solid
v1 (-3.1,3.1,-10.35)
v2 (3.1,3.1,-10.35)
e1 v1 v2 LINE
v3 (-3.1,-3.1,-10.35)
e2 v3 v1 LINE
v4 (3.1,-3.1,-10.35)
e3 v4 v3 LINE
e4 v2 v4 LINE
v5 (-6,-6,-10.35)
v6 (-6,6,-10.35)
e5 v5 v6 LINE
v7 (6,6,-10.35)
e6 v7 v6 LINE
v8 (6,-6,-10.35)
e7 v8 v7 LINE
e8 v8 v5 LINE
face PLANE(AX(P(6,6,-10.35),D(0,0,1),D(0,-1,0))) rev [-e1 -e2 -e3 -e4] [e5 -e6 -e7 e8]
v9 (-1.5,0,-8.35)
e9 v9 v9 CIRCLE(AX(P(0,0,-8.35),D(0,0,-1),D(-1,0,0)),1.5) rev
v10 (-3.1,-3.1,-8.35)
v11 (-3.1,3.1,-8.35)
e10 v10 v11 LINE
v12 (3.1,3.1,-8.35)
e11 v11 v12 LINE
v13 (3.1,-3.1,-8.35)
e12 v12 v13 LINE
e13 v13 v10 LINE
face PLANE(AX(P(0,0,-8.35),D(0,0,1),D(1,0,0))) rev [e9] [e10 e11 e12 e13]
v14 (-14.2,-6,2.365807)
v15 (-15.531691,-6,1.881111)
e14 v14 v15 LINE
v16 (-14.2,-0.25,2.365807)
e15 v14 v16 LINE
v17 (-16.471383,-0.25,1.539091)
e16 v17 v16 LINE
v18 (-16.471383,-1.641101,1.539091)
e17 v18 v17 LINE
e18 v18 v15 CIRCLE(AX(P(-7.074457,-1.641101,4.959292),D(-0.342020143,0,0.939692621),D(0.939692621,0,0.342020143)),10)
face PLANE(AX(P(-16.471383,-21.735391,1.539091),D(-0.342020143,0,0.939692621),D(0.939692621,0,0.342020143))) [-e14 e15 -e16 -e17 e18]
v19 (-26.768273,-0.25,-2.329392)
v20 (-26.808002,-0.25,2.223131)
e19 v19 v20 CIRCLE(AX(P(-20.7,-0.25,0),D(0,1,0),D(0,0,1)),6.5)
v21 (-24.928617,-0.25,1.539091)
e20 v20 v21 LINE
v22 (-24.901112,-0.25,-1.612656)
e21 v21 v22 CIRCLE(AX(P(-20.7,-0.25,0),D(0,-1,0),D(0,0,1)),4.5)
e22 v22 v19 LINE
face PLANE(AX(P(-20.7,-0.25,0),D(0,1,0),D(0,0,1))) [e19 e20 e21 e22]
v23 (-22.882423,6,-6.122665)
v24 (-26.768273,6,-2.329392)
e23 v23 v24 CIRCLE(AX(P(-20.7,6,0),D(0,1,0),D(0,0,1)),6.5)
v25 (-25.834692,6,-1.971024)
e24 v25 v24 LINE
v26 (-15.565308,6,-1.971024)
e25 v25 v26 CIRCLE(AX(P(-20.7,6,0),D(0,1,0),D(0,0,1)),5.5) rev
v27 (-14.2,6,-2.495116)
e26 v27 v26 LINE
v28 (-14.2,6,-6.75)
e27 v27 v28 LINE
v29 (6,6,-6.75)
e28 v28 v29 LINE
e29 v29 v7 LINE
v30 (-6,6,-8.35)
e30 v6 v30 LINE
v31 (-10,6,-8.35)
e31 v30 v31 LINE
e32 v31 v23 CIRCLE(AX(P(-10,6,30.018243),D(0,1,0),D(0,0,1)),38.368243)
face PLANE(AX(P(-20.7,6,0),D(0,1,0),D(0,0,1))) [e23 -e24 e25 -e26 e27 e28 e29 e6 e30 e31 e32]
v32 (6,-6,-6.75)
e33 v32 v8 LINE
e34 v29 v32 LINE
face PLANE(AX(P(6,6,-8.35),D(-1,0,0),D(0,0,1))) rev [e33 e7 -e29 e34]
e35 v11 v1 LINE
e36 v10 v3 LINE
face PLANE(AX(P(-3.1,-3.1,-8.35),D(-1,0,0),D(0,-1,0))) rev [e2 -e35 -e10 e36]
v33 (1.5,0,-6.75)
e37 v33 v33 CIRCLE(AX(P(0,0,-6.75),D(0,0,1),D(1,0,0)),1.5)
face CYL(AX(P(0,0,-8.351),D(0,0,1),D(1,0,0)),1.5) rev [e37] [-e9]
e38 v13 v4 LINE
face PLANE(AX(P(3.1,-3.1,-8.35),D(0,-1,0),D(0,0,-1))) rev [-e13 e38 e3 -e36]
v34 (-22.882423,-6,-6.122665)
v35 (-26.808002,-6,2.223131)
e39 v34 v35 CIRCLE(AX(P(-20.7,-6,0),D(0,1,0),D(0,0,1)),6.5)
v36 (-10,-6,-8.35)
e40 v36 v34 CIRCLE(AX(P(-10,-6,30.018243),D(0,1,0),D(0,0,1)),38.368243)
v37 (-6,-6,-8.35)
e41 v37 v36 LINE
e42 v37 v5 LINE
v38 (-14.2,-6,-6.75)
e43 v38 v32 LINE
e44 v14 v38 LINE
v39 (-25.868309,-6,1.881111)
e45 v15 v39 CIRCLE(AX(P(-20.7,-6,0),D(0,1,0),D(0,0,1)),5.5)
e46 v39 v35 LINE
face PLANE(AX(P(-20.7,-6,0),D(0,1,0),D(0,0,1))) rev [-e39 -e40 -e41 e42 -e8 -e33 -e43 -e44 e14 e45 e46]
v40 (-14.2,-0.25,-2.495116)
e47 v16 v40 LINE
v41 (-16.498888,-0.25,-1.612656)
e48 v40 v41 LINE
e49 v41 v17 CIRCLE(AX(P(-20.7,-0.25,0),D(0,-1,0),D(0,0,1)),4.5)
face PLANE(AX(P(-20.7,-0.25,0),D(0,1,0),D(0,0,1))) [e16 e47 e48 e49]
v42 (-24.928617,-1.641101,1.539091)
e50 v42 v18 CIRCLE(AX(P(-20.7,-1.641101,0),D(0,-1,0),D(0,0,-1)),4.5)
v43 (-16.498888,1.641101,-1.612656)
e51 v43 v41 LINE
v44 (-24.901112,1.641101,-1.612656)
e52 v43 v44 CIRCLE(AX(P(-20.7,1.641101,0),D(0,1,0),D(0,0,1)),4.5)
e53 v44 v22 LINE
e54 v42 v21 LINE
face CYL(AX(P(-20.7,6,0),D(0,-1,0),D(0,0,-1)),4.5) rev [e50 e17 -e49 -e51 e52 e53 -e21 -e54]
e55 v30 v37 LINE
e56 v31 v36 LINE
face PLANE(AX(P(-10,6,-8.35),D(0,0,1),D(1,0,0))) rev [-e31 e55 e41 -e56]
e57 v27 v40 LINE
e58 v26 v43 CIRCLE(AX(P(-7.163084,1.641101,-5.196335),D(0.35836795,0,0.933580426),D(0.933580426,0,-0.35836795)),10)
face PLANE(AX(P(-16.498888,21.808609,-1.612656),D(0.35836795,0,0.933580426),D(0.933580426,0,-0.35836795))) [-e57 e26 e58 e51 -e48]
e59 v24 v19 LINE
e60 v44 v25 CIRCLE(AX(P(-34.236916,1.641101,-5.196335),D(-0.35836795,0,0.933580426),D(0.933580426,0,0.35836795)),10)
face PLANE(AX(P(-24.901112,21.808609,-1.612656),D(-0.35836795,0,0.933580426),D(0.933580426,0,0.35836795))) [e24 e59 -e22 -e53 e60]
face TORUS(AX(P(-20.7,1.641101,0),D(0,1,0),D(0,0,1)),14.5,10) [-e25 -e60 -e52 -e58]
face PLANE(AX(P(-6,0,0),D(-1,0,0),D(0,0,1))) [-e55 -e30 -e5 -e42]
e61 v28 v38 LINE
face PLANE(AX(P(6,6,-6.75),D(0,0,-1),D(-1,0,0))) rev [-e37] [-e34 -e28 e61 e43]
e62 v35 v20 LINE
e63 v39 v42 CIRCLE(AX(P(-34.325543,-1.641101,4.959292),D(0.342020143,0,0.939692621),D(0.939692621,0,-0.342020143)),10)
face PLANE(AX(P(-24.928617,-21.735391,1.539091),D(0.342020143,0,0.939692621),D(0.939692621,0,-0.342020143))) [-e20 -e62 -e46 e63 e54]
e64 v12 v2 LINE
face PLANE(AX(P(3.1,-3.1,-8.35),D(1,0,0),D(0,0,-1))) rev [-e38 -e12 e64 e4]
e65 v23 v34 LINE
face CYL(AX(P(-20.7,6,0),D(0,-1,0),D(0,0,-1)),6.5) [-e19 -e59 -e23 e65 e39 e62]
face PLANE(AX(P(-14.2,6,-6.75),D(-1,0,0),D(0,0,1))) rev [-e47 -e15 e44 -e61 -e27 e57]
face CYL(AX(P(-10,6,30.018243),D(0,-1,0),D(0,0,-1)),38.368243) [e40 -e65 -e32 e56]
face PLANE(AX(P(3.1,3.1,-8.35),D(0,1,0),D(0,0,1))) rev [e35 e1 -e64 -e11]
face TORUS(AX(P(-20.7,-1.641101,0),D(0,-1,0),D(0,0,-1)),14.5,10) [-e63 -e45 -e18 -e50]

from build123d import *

# Parameters (mm, degrees)
BOSS_EXTRUDE1_DEPTH = 6
CUT_EXTRUDE1_REACH  = 30.66
SKETCH3_R           = 1.5
BOSS_EXTRUDE2_DEPTH = 5.75
CUT_EXTRUDE2_START  = 6.25
CUT_EXTRUDE2_DEPTH  = 6.25
CHAMFER1_SIZE       = 1
FILLET1_R           = 10
SKETCH7_W           = 2
SKETCH7_H           = 12
BOSS_EXTRUDE3_DEPTH = 6
SKETCH8_W           = 6.2
SKETCH8_H           = 6.2
CUT_EXTRUDE3_DEPTH  = 2


with BuildPart() as part:
    # Sketch2 → Boss-Extrude1 (new, symmetric)
    with BuildSketch(Plane(origin=(0, 0, 0), x_dir=(1, 0, 0), z_dir=(0, 1, 0))):
        with BuildLine():
            Line((6, 6.75), (-14.2, 6.75))
            Line((-14.2, 6.75), (-14.2, 0))
            Line((-14.2, 0), (-16.2, 0))
            ThreePointArc((-16.2, 0), (-20.7, 4.5), (-25.2, 0))
            Line((-25.2, 0), (-27.2, 0))
            ThreePointArc((-27.2, 0), (-26.012050082, 3.745947667), (-22.882423407, 6.122665112))
            ThreePointArc((-22.882423407, 6.122665112), (-16.536777753, 7.78906592), (-10, 8.35))
            Line((-10, 8.35), (6, 8.35))
            Line((6, 8.35), (6, 6.75))
        make_face()
    extrude(amount=BOSS_EXTRUDE1_DEPTH, both=True)

    # Sketch3 → Cut-Extrude1 (cut, up to next)
    with BuildSketch(Plane.XY.offset(-6.75), mode=Mode.PRIVATE) as cut_extrude1_sk1:
        Circle(SKETCH3_R)
    cut_extrude1_tool1 = extrude(cut_extrude1_sk1.sketch, amount=-CUT_EXTRUDE1_REACH, mode=Mode.PRIVATE) & part.part
    add(cut_extrude1_tool1.solids().sort_by_distance((0, 0, -6.75))[0], mode=Mode.SUBTRACT)

    # Sketch5 → Boss-Extrude2 (add)
    with BuildSketch(Plane(origin=(0, -0.25, 0), x_dir=(1, 0, 0), z_dir=(0, 1, 0))):
        with BuildLine():
            Line((-24.928616794, -1.539090645), (-26.808002035, -2.223130932))
            ThreePointArc((-26.808002035, -2.223130932), (-21.828713155, 6.401250395), (-14.2, 0))
            Line((-14.2, 0), (-14.2, -2.365806523))
            Line((-14.2, -2.365806523), (-16.471383206, -1.539090645))
            ThreePointArc((-16.471383206, -1.539090645), (-20.7, 4.5), (-24.928616794, -1.539090645))
        make_face()
    extrude(amount=-BOSS_EXTRUDE2_DEPTH)

    # Sketch6 → Cut-Extrude2 (cut)
    with BuildSketch(Plane(origin=(0, -0.25, 0), x_dir=(1, 0, 0), z_dir=(0, 1, 0)).offset(CUT_EXTRUDE2_START)):
        with BuildLine():
            Line((-24.901111919, 1.612655773), (-26.768272772, 2.329391672))
            ThreePointArc((-26.768272772, 2.329391672), (-21.884530916, -6.391156899), (-14.2, 0))
            Line((-14.2, 0), (-14.2, 2.495116228))
            Line((-14.2, 2.495116228), (-16.498888081, 1.612655773))
            ThreePointArc((-16.498888081, 1.612655773), (-20.7, -4.5), (-24.901111919, 1.612655773))
        make_face()
    extrude(amount=-CUT_EXTRUDE2_DEPTH, mode=Mode.SUBTRACT)

    # Chamfer1
    chamfer1_edges = [part.edges().sort_by_distance(p)[0] for p in [
        (-20.7, -6, -4.5),
        (-20.7, 6, -4.5),
    ]]
    chamfer(chamfer1_edges, length=CHAMFER1_SIZE)

    # Fillet1
    # the kernel refuses this fillet: 10 mm, written as the material it takes off along each edge
    with BuildSketch(Plane(origin=(-20.7, -5, 0), x_dir=(0.003141587485880374, 0, 0.9999950652018581), z_dir=(-0.9999950652018581, 0, 0.003141587485880374))) as fillet1_piece_1:
        with BuildLine():
            CenterArc((14.5, 3.358898944), FILLET1_R, 180, 25.841932763)
            Line((5.5, -1), (5.32, -1.087177979))
            ThreePointArc((5.32, -1.087177979), (4.858578644, -0.641421356), (4.358578644, -0.141421356))
            Line((4.358578644, -0.141421356), (4.3, 0))
            Line((4.3, 0), (4.3, 3.358898944))
            Line((4.3, 3.358898944), (4.5, 3.358898944))
        make_face()
    revolve(axis=Axis((-20.7, -5, 0), (0, 1, 0)), revolution_arc=359.64, mode=Mode.SUBTRACT)
    with BuildSketch(Plane(origin=(-20.7, 5, 0), x_dir=(0.06944148542988178, 0, 0.9975860264164146), z_dir=(-0.9975860264164146, 0, 0.06944148542988178))) as fillet1_piece_2:
        with BuildLine():
            CenterArc((14.5, -3.358898944), FILLET1_R, 154.158067237, 25.841932763)
            Line((5.5, 1), (5.32, 1.087177979))
            ThreePointArc((5.32, 1.087177979), (4.858578644, 0.641421356), (4.358578644, 0.141421356))
            Line((4.358578644, 0.141421356), (4.3, 0))
            Line((4.3, 0), (4.3, -3.358898944))
            Line((4.3, -3.358898944), (4.5, -3.358898944))
        make_face()
    revolve(axis=Axis((-20.7, 5, 0), (0, 1, 0)), revolution_arc=352.036182743, mode=Mode.SUBTRACT)

    # Sketch7 → Boss-Extrude3 (add, symmetric)
    with BuildSketch(Plane(origin=(0, 0, 0), x_dir=(0, 0, -1), z_dir=(1, 0, 0))):
        with Locations((9.35, 0)):
            Rectangle(SKETCH7_W, SKETCH7_H)
    extrude(amount=BOSS_EXTRUDE3_DEPTH, both=True)

    # Sketch8 → Cut-Extrude3 (cut)
    with BuildSketch(Plane(origin=(0, 0, -10.35), x_dir=(-1, 0, 0), z_dir=(0, 0, -1))):
        Rectangle(SKETCH8_W, SKETCH8_H)
    extrude(amount=-CUT_EXTRUDE3_DEPTH, mode=Mode.SUBTRACT)


solid = part.part
